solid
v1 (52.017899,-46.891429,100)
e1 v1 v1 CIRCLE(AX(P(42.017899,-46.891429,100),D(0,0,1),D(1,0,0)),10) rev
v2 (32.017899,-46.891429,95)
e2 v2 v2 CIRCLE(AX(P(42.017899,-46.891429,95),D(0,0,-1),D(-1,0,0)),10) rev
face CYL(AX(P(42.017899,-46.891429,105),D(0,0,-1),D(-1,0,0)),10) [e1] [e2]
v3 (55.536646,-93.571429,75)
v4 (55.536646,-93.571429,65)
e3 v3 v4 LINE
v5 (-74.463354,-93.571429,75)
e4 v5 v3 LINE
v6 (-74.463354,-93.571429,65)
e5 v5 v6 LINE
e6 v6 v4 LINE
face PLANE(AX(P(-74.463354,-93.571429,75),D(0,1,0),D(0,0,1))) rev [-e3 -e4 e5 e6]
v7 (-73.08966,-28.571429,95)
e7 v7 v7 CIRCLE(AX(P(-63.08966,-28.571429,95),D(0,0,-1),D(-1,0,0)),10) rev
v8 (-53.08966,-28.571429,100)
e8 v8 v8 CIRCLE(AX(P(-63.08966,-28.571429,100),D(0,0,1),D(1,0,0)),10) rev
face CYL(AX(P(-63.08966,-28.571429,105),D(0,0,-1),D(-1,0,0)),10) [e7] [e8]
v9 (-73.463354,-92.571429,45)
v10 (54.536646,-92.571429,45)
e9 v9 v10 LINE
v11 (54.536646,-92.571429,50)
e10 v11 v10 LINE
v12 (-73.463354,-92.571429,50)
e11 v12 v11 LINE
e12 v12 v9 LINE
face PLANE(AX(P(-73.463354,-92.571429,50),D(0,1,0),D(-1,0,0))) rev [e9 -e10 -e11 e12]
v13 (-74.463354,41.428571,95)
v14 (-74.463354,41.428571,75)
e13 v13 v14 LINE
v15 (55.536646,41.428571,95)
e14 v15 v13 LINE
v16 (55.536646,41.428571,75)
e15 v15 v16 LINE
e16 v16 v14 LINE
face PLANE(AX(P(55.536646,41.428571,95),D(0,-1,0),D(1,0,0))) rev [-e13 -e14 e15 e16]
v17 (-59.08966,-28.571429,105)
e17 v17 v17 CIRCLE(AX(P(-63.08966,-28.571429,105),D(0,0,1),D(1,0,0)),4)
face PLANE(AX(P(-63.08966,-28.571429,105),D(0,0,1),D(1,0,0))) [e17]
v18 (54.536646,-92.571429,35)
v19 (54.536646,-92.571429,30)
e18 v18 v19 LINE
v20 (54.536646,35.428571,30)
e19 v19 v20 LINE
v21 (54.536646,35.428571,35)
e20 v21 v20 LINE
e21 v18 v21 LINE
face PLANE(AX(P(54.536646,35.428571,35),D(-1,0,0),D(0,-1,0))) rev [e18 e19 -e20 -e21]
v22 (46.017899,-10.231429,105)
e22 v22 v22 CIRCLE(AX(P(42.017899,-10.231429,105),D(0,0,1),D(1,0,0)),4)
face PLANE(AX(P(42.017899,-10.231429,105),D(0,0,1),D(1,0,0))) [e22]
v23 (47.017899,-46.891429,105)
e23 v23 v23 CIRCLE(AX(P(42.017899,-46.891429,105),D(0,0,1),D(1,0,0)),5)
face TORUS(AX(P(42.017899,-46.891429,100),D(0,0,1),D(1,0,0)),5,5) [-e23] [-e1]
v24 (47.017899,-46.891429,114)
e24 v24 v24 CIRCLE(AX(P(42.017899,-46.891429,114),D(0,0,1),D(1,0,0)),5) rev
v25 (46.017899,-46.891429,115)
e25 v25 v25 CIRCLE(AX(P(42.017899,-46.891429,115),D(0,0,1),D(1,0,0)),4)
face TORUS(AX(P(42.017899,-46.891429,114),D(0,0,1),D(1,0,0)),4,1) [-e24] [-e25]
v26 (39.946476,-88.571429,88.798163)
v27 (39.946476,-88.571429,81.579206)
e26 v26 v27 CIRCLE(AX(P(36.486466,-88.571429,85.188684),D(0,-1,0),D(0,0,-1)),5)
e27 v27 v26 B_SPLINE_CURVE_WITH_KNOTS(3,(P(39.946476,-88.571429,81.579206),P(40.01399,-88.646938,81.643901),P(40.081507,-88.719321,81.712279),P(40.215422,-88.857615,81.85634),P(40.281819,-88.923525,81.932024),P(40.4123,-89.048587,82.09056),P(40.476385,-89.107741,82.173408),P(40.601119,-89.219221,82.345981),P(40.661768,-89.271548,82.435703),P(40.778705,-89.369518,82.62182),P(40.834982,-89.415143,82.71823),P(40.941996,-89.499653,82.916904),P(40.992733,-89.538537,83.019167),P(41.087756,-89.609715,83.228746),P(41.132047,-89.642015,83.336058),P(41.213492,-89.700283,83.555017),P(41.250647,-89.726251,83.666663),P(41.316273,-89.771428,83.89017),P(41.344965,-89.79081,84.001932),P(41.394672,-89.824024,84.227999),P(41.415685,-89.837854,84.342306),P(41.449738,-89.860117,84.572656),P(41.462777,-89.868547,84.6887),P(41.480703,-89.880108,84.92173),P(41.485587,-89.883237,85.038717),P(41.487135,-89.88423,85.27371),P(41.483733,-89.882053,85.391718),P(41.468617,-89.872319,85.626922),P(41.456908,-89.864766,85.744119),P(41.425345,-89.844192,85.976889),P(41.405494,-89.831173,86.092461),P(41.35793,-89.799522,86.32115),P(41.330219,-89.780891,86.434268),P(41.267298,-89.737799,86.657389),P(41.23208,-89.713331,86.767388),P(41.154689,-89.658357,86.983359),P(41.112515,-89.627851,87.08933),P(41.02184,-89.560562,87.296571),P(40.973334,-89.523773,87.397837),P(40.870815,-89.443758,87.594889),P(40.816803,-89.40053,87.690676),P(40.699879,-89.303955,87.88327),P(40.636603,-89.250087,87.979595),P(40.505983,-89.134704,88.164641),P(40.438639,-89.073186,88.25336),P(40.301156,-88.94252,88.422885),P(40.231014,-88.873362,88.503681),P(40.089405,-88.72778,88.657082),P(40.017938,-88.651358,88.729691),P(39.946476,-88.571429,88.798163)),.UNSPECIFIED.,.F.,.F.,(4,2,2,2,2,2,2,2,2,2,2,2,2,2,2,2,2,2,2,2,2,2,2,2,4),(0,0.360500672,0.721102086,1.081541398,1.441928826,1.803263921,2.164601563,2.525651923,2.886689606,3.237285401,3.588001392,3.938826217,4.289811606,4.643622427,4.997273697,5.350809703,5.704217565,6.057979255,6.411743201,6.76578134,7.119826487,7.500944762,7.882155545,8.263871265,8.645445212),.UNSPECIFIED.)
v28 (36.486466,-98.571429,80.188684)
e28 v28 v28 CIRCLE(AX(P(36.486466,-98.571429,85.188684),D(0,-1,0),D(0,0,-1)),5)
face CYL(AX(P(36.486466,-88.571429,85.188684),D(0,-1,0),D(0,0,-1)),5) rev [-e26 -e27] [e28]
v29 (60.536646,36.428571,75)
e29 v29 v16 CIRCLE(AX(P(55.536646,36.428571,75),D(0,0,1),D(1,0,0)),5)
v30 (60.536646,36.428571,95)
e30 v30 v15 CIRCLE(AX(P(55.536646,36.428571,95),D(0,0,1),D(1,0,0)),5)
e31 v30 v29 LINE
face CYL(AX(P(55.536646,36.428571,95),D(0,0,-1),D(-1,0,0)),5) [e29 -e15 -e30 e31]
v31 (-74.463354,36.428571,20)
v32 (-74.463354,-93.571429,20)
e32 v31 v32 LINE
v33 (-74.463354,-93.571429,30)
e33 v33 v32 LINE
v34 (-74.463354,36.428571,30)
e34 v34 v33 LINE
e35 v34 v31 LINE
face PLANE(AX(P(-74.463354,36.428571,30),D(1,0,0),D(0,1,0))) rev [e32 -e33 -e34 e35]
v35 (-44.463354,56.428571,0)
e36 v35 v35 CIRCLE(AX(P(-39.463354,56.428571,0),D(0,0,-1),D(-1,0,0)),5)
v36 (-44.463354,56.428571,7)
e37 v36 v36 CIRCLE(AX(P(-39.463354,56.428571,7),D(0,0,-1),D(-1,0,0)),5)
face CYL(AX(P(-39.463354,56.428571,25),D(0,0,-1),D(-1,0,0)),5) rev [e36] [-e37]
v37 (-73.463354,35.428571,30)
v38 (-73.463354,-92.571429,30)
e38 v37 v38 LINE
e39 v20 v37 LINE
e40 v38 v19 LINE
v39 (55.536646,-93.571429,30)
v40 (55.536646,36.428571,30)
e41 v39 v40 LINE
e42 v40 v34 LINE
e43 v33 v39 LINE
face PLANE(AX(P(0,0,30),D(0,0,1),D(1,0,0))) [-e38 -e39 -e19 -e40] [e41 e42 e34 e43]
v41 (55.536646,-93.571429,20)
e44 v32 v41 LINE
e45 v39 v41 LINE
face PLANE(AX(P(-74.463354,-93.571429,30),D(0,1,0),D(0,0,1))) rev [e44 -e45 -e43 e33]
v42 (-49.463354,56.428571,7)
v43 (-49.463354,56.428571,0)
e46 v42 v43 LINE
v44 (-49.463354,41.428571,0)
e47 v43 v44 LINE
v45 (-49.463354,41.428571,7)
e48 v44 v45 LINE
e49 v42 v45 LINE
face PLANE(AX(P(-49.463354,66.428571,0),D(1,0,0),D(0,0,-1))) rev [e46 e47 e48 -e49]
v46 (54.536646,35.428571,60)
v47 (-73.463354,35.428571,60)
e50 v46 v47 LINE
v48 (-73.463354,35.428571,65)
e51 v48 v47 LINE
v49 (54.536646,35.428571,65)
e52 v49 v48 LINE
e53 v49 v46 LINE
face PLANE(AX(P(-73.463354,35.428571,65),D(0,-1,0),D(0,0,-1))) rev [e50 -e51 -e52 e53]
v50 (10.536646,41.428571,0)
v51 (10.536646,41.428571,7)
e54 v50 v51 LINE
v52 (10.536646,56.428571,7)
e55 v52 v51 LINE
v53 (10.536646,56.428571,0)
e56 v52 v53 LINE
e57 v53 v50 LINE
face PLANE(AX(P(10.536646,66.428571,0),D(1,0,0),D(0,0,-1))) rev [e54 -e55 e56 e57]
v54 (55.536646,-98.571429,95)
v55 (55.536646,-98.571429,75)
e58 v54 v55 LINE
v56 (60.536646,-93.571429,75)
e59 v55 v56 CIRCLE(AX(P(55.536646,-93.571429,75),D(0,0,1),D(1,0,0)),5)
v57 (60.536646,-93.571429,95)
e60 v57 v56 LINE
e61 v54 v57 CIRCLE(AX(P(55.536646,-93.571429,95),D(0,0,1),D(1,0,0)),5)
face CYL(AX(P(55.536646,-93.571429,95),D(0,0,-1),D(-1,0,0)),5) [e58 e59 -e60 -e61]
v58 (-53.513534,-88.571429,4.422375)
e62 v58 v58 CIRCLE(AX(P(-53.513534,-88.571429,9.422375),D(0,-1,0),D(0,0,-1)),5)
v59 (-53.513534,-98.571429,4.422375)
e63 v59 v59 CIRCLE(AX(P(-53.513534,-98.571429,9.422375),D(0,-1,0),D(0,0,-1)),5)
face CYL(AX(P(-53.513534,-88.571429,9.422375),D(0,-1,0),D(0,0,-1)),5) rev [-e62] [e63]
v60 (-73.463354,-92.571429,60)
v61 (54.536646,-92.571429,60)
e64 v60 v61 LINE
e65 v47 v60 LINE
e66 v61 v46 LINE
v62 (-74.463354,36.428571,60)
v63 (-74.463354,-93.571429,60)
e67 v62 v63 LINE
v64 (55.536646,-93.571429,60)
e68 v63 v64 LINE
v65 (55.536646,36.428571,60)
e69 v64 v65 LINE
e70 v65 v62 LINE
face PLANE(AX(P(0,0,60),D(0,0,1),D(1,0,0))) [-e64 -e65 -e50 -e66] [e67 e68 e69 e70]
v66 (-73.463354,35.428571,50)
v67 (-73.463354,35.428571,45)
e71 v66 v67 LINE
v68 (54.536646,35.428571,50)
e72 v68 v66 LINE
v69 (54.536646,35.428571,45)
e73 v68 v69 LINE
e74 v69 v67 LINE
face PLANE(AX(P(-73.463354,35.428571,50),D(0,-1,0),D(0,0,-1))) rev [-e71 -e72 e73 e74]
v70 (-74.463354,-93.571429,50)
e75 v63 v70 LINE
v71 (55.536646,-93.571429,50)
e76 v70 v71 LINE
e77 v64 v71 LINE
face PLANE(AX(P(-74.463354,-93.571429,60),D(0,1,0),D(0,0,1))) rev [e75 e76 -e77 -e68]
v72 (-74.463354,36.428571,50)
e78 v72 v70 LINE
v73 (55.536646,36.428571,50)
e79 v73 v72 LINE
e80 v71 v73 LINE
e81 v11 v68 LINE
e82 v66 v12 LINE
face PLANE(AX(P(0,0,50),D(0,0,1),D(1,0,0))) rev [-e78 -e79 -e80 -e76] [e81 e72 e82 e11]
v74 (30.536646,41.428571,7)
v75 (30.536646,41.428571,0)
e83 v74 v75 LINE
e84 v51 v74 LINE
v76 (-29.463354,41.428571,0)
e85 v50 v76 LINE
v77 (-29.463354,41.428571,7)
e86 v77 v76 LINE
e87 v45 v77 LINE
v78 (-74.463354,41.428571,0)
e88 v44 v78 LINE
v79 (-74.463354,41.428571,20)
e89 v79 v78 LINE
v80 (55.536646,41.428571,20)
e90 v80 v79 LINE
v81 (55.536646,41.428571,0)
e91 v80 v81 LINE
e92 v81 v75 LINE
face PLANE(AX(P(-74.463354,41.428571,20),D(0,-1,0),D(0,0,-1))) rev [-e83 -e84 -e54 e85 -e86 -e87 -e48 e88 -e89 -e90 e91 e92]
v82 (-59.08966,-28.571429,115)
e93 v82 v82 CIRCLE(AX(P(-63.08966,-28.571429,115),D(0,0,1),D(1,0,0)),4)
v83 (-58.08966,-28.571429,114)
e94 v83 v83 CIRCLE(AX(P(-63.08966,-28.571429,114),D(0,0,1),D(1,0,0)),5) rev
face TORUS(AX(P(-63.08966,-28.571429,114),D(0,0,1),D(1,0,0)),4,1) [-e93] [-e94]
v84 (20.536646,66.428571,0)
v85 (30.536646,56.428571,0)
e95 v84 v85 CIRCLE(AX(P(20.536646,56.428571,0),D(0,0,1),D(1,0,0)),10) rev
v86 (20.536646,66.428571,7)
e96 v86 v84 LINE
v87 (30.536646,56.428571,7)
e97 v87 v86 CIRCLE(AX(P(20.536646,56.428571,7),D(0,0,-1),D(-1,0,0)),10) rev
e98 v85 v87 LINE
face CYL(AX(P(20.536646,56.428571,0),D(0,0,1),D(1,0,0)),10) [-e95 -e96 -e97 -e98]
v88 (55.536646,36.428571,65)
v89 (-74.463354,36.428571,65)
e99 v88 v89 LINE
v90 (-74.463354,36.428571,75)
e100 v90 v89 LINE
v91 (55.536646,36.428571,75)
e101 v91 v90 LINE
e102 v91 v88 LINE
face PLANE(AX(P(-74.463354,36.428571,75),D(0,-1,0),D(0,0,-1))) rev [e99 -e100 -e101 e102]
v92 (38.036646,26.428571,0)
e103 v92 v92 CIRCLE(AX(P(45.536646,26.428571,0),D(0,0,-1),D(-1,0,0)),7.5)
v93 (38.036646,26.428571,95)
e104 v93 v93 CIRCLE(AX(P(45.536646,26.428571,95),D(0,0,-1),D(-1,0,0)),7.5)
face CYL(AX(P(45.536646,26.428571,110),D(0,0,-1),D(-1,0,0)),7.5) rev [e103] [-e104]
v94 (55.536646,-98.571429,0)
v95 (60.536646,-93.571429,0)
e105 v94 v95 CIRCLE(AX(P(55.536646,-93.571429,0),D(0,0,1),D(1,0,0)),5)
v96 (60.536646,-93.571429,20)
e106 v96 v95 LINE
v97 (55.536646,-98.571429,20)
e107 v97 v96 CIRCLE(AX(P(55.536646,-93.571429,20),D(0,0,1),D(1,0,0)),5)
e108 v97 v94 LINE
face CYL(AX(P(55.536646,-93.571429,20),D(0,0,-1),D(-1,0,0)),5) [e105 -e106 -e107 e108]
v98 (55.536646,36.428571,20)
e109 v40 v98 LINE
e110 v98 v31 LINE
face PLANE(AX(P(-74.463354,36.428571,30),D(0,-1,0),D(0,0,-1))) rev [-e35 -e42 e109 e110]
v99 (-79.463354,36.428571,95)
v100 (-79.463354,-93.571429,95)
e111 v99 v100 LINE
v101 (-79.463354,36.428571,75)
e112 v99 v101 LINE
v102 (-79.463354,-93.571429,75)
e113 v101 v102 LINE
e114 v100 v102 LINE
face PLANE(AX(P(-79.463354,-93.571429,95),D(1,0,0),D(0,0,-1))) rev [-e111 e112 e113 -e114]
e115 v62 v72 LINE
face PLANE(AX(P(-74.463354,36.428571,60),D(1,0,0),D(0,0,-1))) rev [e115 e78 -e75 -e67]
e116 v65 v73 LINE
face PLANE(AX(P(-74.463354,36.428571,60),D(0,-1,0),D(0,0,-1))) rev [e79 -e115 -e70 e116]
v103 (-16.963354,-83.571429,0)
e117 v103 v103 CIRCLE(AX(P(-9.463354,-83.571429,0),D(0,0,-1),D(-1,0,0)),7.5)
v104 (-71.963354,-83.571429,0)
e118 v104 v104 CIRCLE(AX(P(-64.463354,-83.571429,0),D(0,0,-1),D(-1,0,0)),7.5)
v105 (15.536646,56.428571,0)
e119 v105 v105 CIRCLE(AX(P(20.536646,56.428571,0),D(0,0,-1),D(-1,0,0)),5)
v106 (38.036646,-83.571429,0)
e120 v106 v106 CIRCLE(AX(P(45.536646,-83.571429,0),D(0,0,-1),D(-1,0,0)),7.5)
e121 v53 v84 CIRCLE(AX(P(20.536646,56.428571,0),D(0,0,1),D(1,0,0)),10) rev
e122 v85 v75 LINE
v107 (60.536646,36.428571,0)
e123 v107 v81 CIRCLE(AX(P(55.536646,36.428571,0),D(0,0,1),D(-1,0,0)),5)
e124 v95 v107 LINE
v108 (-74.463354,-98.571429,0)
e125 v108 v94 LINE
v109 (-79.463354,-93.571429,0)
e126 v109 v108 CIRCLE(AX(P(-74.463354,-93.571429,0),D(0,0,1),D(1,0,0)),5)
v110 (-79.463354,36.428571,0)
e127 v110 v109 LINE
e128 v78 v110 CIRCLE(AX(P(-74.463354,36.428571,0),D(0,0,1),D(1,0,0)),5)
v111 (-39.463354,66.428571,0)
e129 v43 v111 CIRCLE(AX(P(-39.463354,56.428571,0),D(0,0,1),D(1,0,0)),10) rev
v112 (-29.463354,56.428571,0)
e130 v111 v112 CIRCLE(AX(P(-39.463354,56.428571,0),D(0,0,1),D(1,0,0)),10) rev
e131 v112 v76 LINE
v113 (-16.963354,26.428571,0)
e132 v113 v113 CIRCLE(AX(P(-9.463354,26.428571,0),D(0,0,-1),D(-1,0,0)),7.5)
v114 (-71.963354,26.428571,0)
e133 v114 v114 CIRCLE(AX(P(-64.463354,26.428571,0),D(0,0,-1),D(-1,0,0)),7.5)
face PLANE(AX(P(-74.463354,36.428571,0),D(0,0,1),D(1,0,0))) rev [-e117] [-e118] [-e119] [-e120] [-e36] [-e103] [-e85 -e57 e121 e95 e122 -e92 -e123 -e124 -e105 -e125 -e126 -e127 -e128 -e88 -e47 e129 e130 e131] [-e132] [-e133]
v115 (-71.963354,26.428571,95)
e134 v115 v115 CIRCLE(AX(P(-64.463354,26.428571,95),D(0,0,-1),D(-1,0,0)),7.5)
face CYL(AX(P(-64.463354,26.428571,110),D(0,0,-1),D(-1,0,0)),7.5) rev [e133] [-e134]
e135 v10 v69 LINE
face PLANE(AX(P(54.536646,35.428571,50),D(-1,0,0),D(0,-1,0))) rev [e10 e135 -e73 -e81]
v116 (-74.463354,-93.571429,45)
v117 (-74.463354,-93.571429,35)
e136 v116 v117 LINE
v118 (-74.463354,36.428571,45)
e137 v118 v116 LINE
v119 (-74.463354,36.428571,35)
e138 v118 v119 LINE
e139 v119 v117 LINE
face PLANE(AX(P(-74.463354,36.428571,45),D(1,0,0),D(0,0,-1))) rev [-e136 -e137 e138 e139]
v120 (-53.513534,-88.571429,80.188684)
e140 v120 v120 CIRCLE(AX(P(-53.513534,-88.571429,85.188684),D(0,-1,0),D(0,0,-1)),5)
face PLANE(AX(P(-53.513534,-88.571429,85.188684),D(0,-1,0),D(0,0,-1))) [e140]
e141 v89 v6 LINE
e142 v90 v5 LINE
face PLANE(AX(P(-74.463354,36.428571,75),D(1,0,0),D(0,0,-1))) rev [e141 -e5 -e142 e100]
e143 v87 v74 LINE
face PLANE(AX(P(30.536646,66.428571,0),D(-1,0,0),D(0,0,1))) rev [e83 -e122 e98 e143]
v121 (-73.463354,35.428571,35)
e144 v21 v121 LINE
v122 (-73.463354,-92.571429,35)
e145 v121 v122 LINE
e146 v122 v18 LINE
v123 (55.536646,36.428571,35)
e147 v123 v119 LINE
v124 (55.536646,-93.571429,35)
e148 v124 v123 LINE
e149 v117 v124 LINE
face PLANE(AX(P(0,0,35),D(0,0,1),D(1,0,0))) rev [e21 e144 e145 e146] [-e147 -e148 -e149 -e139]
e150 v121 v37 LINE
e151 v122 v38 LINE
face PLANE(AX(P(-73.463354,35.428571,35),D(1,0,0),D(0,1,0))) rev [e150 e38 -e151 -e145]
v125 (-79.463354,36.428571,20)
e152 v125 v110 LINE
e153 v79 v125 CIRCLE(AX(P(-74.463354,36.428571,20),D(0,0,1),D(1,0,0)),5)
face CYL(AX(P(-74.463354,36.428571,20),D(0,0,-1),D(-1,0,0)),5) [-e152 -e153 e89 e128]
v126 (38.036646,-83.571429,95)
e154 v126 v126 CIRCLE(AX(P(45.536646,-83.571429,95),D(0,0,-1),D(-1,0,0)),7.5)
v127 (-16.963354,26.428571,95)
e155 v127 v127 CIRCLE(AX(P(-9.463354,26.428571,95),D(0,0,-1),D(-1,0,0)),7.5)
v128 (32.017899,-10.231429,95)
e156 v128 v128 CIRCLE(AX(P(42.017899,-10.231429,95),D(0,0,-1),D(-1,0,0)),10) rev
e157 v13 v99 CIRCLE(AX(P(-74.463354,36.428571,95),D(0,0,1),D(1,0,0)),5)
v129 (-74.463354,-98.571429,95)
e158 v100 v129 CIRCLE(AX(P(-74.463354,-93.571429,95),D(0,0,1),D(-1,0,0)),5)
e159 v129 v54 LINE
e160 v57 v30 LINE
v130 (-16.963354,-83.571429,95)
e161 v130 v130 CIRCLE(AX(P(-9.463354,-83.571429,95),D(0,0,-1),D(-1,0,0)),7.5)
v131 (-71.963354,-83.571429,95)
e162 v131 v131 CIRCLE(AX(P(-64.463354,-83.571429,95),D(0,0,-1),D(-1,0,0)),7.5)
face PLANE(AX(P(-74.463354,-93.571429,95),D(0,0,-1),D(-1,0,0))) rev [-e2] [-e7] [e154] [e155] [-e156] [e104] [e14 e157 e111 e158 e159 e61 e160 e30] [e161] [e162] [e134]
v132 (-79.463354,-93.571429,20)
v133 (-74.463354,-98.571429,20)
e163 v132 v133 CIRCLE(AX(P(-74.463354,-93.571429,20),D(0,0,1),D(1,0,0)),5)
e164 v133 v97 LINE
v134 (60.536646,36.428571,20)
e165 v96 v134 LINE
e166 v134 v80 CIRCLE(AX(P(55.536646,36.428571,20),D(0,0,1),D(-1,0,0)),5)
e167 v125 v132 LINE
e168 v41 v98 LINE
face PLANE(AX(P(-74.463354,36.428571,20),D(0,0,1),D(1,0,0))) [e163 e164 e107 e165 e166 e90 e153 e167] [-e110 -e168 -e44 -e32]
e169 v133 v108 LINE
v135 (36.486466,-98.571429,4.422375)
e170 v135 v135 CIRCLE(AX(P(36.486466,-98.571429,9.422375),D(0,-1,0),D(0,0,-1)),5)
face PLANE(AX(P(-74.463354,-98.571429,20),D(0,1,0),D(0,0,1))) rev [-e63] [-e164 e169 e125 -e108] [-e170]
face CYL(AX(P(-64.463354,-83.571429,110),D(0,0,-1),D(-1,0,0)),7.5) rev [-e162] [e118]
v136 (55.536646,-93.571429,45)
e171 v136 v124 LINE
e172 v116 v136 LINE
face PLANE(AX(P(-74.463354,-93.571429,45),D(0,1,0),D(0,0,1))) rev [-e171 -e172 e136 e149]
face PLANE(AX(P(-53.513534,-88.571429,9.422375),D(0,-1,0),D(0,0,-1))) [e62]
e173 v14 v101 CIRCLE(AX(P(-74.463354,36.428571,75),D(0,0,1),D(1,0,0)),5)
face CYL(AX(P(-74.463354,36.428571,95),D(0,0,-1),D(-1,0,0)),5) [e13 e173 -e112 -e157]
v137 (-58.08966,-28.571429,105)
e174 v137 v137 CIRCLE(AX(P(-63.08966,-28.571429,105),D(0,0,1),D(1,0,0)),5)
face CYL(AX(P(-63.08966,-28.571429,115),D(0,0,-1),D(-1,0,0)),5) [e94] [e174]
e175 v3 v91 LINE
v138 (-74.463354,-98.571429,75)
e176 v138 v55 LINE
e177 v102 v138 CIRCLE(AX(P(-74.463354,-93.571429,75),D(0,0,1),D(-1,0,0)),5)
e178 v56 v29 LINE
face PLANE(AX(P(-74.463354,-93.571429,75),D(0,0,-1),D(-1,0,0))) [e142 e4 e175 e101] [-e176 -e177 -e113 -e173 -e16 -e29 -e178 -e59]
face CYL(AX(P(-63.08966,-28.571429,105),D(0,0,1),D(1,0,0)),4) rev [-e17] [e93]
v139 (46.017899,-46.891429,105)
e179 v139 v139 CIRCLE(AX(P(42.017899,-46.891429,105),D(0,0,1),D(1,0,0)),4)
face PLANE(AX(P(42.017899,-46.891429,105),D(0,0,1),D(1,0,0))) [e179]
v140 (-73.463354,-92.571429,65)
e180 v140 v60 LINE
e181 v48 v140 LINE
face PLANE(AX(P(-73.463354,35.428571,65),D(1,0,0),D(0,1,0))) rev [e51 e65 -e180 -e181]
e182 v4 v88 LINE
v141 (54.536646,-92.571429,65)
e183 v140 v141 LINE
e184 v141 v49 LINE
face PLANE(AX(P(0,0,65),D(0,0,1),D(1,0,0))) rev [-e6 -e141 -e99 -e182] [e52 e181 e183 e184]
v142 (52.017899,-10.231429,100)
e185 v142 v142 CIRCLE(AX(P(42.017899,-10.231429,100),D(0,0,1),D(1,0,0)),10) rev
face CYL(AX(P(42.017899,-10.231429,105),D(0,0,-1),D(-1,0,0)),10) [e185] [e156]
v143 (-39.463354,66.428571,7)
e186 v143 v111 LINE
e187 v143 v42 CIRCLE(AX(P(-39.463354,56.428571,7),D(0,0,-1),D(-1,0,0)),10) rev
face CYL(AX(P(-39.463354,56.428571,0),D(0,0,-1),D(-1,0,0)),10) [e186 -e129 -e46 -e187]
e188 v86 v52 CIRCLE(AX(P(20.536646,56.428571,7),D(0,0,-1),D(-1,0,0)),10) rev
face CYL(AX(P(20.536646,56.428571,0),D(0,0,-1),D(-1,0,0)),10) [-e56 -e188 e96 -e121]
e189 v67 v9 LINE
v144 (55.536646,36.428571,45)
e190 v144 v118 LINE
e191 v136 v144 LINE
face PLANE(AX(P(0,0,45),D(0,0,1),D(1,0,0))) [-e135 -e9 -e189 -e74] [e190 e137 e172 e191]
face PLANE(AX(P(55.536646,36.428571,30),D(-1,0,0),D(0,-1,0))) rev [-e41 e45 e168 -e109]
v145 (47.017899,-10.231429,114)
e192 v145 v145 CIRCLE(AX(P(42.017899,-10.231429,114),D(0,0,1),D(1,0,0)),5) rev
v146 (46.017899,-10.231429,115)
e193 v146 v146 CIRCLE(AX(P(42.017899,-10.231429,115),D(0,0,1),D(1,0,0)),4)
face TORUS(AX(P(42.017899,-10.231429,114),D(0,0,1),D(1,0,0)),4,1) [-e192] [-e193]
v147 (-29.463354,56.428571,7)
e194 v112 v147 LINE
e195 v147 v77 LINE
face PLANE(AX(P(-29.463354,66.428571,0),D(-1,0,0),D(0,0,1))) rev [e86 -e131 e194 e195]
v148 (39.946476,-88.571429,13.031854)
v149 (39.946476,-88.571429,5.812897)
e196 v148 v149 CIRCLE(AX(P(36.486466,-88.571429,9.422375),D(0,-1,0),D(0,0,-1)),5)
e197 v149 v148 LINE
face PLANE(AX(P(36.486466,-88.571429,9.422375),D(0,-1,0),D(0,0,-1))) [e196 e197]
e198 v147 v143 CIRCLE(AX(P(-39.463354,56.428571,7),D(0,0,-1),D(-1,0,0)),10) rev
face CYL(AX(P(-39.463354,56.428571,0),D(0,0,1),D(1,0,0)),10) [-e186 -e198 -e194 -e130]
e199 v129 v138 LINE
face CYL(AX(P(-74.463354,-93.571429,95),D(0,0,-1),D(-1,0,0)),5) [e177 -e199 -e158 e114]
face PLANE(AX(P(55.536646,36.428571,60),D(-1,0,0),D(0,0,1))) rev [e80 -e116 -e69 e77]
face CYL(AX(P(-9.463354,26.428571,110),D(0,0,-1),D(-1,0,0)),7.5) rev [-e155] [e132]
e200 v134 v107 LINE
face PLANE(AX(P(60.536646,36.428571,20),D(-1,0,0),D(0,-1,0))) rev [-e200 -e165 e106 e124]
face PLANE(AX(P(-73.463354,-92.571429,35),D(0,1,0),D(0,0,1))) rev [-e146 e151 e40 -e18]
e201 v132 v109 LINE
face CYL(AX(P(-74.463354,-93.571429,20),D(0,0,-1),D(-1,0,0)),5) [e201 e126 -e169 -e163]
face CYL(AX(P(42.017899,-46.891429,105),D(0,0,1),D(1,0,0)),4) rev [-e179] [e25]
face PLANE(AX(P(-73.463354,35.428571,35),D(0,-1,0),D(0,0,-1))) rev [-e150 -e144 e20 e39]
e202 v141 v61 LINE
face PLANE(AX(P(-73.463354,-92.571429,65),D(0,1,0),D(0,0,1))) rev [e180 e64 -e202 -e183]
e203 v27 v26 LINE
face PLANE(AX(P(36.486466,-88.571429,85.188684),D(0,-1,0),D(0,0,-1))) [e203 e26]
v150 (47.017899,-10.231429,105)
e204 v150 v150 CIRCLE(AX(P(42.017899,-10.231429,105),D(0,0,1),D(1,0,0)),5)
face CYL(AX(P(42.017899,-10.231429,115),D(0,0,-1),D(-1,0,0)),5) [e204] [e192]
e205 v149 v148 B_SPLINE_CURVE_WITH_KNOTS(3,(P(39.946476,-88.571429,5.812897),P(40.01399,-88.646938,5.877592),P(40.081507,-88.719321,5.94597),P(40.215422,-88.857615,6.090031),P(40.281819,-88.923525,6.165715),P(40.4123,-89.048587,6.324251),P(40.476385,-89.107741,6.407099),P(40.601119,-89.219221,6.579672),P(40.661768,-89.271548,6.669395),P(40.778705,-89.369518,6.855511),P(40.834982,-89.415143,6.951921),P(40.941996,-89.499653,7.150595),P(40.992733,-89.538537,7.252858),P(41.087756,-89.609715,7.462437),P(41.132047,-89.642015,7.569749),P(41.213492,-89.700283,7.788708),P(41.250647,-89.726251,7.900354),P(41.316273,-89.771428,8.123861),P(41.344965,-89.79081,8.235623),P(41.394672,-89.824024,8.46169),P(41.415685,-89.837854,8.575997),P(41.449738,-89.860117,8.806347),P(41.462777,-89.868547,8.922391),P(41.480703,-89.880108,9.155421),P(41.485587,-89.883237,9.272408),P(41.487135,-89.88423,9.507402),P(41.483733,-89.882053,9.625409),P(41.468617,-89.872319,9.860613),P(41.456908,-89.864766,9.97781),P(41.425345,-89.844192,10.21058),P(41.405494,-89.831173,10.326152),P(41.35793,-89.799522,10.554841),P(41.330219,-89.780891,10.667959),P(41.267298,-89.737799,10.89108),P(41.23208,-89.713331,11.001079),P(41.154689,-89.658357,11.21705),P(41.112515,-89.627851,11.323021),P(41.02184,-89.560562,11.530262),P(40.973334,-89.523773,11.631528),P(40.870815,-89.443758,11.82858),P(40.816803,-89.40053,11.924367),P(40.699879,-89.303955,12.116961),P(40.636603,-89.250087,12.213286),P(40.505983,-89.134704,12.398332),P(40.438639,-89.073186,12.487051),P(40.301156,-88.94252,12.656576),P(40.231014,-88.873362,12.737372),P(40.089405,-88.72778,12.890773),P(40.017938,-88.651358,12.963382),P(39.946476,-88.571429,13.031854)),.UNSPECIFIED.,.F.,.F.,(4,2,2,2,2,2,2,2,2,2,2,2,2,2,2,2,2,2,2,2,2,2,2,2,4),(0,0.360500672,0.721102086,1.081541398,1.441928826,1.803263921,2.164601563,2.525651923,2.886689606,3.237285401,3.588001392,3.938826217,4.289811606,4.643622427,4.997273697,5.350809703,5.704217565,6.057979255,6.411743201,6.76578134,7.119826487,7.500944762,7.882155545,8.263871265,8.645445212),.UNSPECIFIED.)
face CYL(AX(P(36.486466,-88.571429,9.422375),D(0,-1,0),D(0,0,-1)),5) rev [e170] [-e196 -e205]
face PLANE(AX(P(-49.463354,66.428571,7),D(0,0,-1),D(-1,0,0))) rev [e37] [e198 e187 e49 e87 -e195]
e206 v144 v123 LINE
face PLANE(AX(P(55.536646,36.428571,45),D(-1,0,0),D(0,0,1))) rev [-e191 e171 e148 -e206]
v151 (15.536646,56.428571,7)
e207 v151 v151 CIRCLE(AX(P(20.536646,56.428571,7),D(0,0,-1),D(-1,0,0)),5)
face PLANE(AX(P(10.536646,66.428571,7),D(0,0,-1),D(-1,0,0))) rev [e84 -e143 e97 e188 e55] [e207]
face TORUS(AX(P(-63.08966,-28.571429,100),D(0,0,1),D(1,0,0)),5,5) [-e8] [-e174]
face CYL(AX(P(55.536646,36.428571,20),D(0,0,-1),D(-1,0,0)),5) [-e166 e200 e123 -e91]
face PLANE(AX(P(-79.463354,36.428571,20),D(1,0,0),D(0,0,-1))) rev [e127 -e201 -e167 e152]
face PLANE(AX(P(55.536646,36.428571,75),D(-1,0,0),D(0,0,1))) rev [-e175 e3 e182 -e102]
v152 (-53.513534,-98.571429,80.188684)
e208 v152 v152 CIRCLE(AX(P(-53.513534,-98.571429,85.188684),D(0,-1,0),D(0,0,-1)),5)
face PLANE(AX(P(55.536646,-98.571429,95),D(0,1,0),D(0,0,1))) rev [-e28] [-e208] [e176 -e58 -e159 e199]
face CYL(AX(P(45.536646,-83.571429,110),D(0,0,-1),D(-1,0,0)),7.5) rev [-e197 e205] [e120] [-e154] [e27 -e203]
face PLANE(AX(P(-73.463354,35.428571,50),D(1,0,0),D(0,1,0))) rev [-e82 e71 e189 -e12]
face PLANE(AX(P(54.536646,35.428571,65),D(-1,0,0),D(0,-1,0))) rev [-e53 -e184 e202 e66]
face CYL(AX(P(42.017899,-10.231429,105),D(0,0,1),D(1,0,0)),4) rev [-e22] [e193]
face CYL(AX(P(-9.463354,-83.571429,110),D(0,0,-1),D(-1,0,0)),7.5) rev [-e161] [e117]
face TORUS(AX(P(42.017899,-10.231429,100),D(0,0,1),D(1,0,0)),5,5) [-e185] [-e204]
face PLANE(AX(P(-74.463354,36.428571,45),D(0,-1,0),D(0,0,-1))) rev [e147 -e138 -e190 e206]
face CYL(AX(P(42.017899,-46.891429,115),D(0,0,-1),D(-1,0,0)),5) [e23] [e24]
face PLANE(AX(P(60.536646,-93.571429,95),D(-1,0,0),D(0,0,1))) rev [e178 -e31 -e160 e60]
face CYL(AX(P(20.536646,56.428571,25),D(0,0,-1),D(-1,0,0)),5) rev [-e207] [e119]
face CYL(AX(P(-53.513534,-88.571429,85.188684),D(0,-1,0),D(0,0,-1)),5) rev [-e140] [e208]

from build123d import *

# Parameters (mm, degrees)
BOSS_EXTRU_1_DEPTH      = 20
ESQUISSE2_W             = 130
ESQUISSE2_H             = 130
BOSS_EXTRU_2_DEPTH      = 10
ESQUISSE4_W             = 128
ESQUISSE4_H             = 128
BOSS_EXTRU_4_DEPTH      = 5
ESQUISSE5_W             = 130
ESQUISSE5_H             = 130
BOSS_EXTRU_5_DEPTH      = 10
ESQUISSE6_W             = 128
ESQUISSE6_H             = 128
BOSS_EXTRU_6_DEPTH      = 5
ESQUISSE7_W             = 130
ESQUISSE7_H             = 130
BOSS_EXTRU_7_DEPTH      = 10
ESQUISSE8_W             = 128
ESQUISSE8_H             = 128
BOSS_EXTRU_8_DEPTH      = 5
ESQUISSE9_W             = 130
ESQUISSE9_H             = 130
BOSS_EXTRU_9_DEPTH      = 10
BOSS_EXTRU_10_DEPTH     = 20
ESQUISSE11_R            = 7.5
ENL_V_MAT_EXTRU_1_DEPTH = 110
ESQUISSE12_R            = 10
BOSS_EXTRU_11_DEPTH     = 10
ESQUISSE13_R            = 5
BOSS_EXTRU_12_DEPTH     = 10
CONG_2_R                = 5
CONG_3_R                = 5
ESQUISSE14_R            = 4
ENL_V_MAT_EXTRU_2_DEPTH = 10
CONG_4_R                = 1
ESQUISSE15_R            = 5
ENL_V_MAT_EXTRU_3_DEPTH = 10
ESQUISSE16_W            = 20
ESQUISSE16_H            = 7
BOSS_EXTRU_13_DEPTH     = 25
CONG_5_R                = 10
ESQUISSE17_R            = 5
ENL_V_MAT_EXTRU_4_DEPTH = 25


with BuildPart() as part:
    # Esquisse1 → Boss.-Extru.1 (new body)
    with BuildSketch(Plane.XY):
        with BuildLine():
            Line((-74.463354037, 41.428571429), (55.536645963, 41.428571429))
            ThreePointArc((55.536645963, 41.428571429), (59.072179869, 39.964105335), (60.536645963, 36.428571429))
            Line((60.536645963, 36.428571429), (60.536645963, -93.571428571))
            ThreePointArc((60.536645963, -93.571428571), (59.072179869, -97.106962477), (55.536645963, -98.571428571))
            Line((55.536645963, -98.571428571), (-74.463354037, -98.571428571))
            ThreePointArc((-74.463354037, -98.571428571), (-77.998887943, -97.106962477), (-79.463354037, -93.571428571))
            Line((-79.463354037, -93.571428571), (-79.463354037, 36.428571429))
            ThreePointArc((-79.463354037, 36.428571429), (-77.998887943, 39.964105335), (-74.463354037, 41.428571429))
        make_face()
    extrude(amount=BOSS_EXTRU_1_DEPTH)

    # Esquisse2 → Boss.-Extru.2 (add)
    with BuildSketch(Plane.XY.offset(20)):
        with Locations((-9.463354037, -28.571428571)):
            Rectangle(ESQUISSE2_W, ESQUISSE2_H)
    extrude(amount=BOSS_EXTRU_2_DEPTH)

    # Esquisse4 → Boss.-Extru.4 (add)
    with BuildSketch(Plane.XY.offset(30)):
        with Locations((-9.463354037, -28.571428571)):
            Rectangle(ESQUISSE4_W, ESQUISSE4_H)
    extrude(amount=BOSS_EXTRU_4_DEPTH)

    # Esquisse5 → Boss.-Extru.5 (add)
    with BuildSketch(Plane.XY.offset(35)):
        with Locations((-9.463354037, -28.571428571)):
            Rectangle(ESQUISSE5_W, ESQUISSE5_H)
    extrude(amount=BOSS_EXTRU_5_DEPTH)

    # Esquisse6 → Boss.-Extru.6 (add)
    with BuildSketch(Plane.XY.offset(45)):
        with Locations((-9.463354037, -28.571428571)):
            Rectangle(ESQUISSE6_W, ESQUISSE6_H)
    extrude(amount=BOSS_EXTRU_6_DEPTH)

    # Esquisse7 → Boss.-Extru.7 (add)
    with BuildSketch(Plane.XY.offset(50)):
        with Locations((-9.463354037, -28.571428571)):
            Rectangle(ESQUISSE7_W, ESQUISSE7_H)
    extrude(amount=BOSS_EXTRU_7_DEPTH)

    # Esquisse8 → Boss.-Extru.8 (add)
    with BuildSketch(Plane.XY.offset(60)):
        with Locations((-9.463354037, -28.571428571)):
            Rectangle(ESQUISSE8_W, ESQUISSE8_H)
    extrude(amount=BOSS_EXTRU_8_DEPTH)

    # Esquisse9 → Boss.-Extru.9 (add)
    with BuildSketch(Plane.XY.offset(65)):
        with Locations((-9.463354037, -28.571428571)):
            Rectangle(ESQUISSE9_W, ESQUISSE9_H)
    extrude(amount=BOSS_EXTRU_9_DEPTH)

    # Esquisse10 → Boss.-Extru.10 (add)
    with BuildSketch(Plane.XY.offset(75)):
        with BuildLine():
            Line((55.536645963, -98.571428571), (-74.463354037, -98.571428571))
            ThreePointArc((-74.463354037, -98.571428571), (-77.998887943, -97.106962477), (-79.463354037, -93.571428571))
            Line((-79.463354037, -93.571428571), (-79.463354037, 36.428571429))
            ThreePointArc((-79.463354037, 36.428571429), (-77.998887943, 39.964105335), (-74.463354037, 41.428571429))
            Line((-74.463354037, 41.428571429), (55.536645963, 41.428571429))
            ThreePointArc((55.536645963, 41.428571429), (59.072179869, 39.964105335), (60.536645963, 36.428571429))
            Line((60.536645963, 36.428571429), (60.536645963, -93.571428571))
            ThreePointArc((60.536645963, -93.571428571), (59.072179869, -97.106962477), (55.536645963, -98.571428571))
        make_face()
    extrude(amount=BOSS_EXTRU_10_DEPTH)

    # Esquisse11 → Enlèv. mat.-Extru.1 (cut)
    with BuildSketch(Plane(origin=(0, 0, 0), x_dir=(-1, 0, 0), z_dir=(0, 0, -1))):
        with Locations((-45.536645963, 26.428571429)):
            Circle(ESQUISSE11_R)
        with Locations((9.463354037, 26.428571429)):
            Circle(ESQUISSE11_R)
        with Locations((64.463354037, 26.428571429)):
            Circle(ESQUISSE11_R)
        with Locations((64.463354037, -83.571428571)):
            Circle(ESQUISSE11_R)
        with Locations((9.463354037, -83.571428571)):
            Circle(ESQUISSE11_R)
        with Locations((-45.536645963, -83.571428571)):
            Circle(ESQUISSE11_R)
    extrude(amount=-ENL_V_MAT_EXTRU_1_DEPTH, mode=Mode.SUBTRACT)

    # Esquisse12 → Boss.-Extru.11 (add)
    with BuildSketch(Plane.XY.offset(95)):
        with Locations(Location((42.017899374, -10.231428571, 0), (0, 0, 180))):
            Circle(ESQUISSE12_R)
        with Locations(Location((42.017899374, -46.891428571, 0), (0, 0, 180))):
            Circle(ESQUISSE12_R)
        with Locations(Location((-63.089659674, -28.571428571, 0), (0, 0, 180))):
            Circle(ESQUISSE12_R)
    extrude(amount=BOSS_EXTRU_11_DEPTH)

    # Esquisse13 → Boss.-Extru.12 (add)
    with BuildSketch(Plane.XY.offset(105)):
        with Locations((42.017899374, -10.231428571)):
            Circle(ESQUISSE13_R)
        with Locations((42.017899374, -46.891428571)):
            Circle(ESQUISSE13_R)
        with Locations((-63.089659674, -28.571428571)):
            Circle(ESQUISSE13_R)
    extrude(amount=BOSS_EXTRU_12_DEPTH)

    # Congé2
    cong_2_edges = [part.edges().sort_by_distance(p)[0] for p in [
        (-53.089659674, -28.571428571, 105),
    ]]
    fillet(cong_2_edges, radius=CONG_2_R - 0.0001)  # a hair under: the kernel refuses the full size

    # Congé3
    cong_3_edges = [part.edges().sort_by_distance(p)[0] for p in [
        (52.017899374, -10.231428571, 105),
        (52.017899374, -46.891428571, 105),
    ]]
    fillet(cong_3_edges, radius=CONG_3_R - 0.0001)  # a hair under: the kernel refuses the full size

    # Esquisse14 → Enlèv. mat.-Extru.2 (cut)
    with BuildSketch(Plane.XY.offset(115)):
        with Locations((42.017899374, -10.231428571)):
            Circle(ESQUISSE14_R)
        with Locations((42.017899374, -46.891428571)):
            Circle(ESQUISSE14_R)
        with Locations((-63.089659674, -28.571428571)):
            Circle(ESQUISSE14_R)
    extrude(amount=-ENL_V_MAT_EXTRU_2_DEPTH, mode=Mode.SUBTRACT)

    # Congé4
    cong_4_edges = [part.edges().sort_by_distance(p)[0] for p in [
        (37.017899374, -10.231428571, 115),
        (37.017899374, -46.891428571, 115),
        (-68.089659674, -28.571428571, 115),
    ]]
    fillet(cong_4_edges, radius=CONG_4_R - 0.0001)  # a hair under: the kernel refuses the full size

    # Esquisse15 → Enlèv. mat.-Extru.3 (cut)
    with BuildSketch(Plane.XZ.offset(98.571428571)):
        with Locations(Location((-53.513533667, 9.422375375, 0), (0, 0, 270))):
            Circle(ESQUISSE15_R)
        with Locations(Location((36.486466333, 9.422375375, 0), (0, 0, 270))):
            Circle(ESQUISSE15_R)
        with Locations(Location((36.486466333, 85.188684339, 0), (0, 0, 270))):
            Circle(ESQUISSE15_R)
        with Locations(Location((-53.513533667, 85.188684339, 0), (0, 0, 270))):
            Circle(ESQUISSE15_R)
    extrude(amount=-ENL_V_MAT_EXTRU_3_DEPTH, mode=Mode.SUBTRACT)

    # Esquisse16 → Boss.-Extru.13 (add)
    with BuildSketch(Plane(origin=(0, 41.428571429, 0), x_dir=(1, 0, 0), z_dir=(0, 1, 0))):
        with Locations((-39.463354037, -3.5)):
            Rectangle(ESQUISSE16_W, ESQUISSE16_H)
        with Locations((20.536645963, -3.5)):
            Rectangle(ESQUISSE16_W, ESQUISSE16_H)
    extrude(amount=BOSS_EXTRU_13_DEPTH)

    # Congé5
    cong_5_edges = [part.edges().sort_by_distance(p)[0] for p in [
        (-49.463354037, 66.428571429, 3.5),
        (-29.463354037, 66.428571429, 3.5),
        (10.536645963, 66.428571429, 3.5),
        (30.536645963, 66.428571429, 3.5),
    ]]
    fillet(cong_5_edges, radius=CONG_5_R - 0.0001)  # a hair under: the kernel refuses the full size

    # Esquisse17 → Enlèv. mat.-Extru.4 (cut)
    with BuildSketch(Plane(origin=(0, 0, 0), x_dir=(-1, 0, 0), z_dir=(0, 0, -1))):
        with Locations((-20.536645963, 56.428571429)):
            Circle(ESQUISSE17_R)
        with Locations((39.463354037, 56.428571429)):
            Circle(ESQUISSE17_R)
    extrude(amount=-ENL_V_MAT_EXTRU_4_DEPTH, mode=Mode.SUBTRACT)


solid = part.part
